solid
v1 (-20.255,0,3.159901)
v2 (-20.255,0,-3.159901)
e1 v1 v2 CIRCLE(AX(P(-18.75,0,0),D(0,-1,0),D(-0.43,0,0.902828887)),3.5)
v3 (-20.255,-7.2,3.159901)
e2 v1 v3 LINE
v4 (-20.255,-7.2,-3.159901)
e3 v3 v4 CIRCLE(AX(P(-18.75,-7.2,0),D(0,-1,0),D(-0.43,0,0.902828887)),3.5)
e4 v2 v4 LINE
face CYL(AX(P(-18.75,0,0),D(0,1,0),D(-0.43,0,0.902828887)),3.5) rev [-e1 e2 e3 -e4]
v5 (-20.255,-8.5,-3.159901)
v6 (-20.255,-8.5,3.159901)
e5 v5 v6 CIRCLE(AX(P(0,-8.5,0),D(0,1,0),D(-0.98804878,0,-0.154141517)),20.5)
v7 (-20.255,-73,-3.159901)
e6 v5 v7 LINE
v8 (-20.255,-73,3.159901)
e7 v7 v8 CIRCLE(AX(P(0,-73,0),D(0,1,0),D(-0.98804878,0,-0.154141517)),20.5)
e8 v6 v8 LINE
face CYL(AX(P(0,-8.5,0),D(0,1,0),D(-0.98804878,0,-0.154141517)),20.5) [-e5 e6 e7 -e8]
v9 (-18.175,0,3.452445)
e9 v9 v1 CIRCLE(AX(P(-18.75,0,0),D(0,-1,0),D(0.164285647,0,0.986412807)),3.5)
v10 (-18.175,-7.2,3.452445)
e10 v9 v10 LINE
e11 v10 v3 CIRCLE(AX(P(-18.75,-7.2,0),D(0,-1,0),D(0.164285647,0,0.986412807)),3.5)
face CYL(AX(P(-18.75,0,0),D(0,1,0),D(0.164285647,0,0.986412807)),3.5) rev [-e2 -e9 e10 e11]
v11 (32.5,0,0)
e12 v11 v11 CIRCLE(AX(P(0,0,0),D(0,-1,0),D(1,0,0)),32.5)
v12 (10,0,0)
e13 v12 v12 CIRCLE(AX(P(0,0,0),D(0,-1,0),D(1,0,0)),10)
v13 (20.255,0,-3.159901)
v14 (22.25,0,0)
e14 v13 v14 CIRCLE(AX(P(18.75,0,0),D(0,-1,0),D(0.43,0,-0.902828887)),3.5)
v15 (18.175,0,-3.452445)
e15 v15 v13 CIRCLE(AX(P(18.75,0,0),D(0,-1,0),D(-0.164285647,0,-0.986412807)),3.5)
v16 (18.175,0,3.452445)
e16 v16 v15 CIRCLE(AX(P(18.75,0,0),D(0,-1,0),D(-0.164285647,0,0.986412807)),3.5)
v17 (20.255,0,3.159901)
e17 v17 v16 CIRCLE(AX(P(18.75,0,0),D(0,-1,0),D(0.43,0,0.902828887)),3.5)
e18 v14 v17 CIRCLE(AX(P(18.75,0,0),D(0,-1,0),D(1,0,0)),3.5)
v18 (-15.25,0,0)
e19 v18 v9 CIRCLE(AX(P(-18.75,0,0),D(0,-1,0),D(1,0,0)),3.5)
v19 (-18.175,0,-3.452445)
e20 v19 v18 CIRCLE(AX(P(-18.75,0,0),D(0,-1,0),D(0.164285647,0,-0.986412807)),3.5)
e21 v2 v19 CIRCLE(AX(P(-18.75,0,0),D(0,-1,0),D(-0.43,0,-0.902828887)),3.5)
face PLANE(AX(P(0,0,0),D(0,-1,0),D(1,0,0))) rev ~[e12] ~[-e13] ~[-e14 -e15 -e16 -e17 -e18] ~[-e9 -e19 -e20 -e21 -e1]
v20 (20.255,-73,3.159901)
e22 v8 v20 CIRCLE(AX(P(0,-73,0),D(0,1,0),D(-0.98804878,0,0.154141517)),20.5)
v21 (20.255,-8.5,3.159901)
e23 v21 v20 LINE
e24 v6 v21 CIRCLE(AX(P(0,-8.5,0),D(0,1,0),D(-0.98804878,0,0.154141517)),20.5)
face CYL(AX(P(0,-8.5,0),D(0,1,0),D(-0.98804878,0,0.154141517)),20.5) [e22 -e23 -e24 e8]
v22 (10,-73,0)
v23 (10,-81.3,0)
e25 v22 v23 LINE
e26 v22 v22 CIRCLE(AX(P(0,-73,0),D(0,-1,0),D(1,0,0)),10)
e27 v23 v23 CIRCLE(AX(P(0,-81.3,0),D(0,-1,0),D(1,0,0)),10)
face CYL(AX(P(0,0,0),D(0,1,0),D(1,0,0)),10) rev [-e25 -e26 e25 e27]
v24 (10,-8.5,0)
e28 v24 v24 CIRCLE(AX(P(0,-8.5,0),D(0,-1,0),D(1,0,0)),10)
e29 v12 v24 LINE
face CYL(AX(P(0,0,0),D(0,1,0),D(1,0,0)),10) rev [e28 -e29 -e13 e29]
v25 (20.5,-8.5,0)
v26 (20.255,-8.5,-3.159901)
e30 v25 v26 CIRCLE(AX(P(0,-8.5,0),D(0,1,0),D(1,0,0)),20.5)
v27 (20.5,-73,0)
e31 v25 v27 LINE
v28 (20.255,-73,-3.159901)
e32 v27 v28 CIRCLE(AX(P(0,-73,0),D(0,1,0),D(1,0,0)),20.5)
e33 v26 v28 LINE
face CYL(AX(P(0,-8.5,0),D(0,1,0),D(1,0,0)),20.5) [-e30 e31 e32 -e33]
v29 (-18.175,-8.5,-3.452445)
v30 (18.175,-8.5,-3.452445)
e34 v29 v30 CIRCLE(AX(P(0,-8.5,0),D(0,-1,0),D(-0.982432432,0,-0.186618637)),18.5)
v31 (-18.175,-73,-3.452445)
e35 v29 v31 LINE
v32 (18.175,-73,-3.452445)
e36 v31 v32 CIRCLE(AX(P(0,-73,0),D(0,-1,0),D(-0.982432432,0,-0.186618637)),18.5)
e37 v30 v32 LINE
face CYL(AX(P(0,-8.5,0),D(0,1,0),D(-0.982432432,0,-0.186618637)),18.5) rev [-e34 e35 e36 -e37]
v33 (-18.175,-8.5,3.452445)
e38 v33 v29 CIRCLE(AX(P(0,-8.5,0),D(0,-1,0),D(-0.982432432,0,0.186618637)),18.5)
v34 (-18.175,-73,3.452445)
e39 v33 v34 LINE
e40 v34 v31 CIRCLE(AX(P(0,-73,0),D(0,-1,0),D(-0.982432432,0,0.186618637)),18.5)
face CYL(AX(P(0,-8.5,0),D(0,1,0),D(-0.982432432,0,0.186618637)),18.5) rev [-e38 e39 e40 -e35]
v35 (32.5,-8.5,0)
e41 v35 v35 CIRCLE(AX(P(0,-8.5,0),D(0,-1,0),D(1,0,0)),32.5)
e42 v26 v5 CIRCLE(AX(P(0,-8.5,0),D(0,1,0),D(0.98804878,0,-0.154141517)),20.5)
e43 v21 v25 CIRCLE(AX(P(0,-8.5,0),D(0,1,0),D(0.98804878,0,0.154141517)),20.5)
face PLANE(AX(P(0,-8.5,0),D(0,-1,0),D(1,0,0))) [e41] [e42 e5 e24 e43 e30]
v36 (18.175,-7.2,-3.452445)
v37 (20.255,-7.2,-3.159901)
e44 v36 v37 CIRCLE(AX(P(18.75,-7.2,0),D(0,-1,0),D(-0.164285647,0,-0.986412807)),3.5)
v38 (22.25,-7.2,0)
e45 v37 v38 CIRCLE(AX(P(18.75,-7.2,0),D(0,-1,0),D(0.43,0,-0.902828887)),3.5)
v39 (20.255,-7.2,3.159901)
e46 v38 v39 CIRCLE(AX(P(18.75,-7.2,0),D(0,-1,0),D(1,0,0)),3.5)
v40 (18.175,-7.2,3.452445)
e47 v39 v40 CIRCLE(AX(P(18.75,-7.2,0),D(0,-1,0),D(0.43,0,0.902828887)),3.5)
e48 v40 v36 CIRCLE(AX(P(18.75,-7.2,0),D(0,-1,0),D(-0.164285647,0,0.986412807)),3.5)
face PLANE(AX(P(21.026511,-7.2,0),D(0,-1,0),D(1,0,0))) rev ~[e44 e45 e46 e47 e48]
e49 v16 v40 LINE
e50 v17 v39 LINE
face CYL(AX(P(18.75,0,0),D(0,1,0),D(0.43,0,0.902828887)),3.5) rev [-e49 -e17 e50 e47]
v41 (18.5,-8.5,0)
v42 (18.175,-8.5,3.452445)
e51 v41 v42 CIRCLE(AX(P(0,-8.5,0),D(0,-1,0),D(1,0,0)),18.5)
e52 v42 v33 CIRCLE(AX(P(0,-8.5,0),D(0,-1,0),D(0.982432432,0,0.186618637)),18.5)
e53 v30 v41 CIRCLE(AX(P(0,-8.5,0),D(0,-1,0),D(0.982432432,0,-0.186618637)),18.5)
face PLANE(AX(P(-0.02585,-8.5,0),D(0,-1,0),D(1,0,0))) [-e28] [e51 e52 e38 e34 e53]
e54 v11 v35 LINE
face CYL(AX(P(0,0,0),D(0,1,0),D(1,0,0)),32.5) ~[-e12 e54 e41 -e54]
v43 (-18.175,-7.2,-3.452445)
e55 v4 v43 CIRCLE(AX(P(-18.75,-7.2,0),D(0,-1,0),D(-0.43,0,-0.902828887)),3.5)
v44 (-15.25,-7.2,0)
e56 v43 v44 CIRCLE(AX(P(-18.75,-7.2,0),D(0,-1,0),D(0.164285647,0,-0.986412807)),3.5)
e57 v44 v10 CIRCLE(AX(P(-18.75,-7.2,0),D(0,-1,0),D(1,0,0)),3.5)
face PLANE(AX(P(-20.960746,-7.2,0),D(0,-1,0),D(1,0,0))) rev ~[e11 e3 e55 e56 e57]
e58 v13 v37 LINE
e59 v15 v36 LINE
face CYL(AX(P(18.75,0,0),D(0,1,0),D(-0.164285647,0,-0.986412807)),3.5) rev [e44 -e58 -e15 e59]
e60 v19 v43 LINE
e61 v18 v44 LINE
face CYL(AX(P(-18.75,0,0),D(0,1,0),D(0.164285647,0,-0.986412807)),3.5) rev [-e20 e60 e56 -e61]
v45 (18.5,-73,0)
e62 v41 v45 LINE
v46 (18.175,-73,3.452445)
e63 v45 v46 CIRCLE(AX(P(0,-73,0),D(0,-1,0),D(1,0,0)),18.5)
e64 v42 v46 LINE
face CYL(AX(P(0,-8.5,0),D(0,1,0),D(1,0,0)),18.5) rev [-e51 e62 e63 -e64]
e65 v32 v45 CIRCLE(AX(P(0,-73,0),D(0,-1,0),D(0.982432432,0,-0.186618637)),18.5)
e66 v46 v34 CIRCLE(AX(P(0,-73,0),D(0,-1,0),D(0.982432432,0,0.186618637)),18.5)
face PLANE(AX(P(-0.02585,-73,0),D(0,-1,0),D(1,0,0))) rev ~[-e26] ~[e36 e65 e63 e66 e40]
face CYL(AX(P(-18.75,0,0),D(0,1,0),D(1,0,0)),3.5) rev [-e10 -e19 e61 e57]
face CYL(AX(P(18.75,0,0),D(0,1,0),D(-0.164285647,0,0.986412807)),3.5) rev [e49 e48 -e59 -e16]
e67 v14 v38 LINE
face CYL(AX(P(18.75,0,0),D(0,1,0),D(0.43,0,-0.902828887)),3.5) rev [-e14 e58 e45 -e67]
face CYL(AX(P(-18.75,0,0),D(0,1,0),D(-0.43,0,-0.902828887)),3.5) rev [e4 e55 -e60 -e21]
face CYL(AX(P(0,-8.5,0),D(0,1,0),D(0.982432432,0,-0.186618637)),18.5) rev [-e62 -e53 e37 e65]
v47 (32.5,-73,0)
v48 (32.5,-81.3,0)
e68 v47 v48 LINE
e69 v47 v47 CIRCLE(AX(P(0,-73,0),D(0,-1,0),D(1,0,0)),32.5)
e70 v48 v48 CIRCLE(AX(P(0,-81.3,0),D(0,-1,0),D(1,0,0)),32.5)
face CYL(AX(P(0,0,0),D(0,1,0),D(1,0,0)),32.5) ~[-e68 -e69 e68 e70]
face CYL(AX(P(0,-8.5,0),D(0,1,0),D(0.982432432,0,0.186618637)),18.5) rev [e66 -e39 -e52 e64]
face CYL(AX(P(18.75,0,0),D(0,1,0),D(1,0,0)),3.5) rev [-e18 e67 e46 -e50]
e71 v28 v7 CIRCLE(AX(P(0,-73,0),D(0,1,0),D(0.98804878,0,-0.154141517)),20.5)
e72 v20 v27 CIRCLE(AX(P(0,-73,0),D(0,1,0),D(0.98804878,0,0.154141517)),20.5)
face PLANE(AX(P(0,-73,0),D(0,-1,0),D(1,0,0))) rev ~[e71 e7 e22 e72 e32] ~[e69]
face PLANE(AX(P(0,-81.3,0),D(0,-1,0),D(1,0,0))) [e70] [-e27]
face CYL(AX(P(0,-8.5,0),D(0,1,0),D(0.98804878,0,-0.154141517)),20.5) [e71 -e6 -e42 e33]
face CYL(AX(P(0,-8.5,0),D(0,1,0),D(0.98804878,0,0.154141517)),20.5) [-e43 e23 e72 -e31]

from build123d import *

# Parameters (mm, degrees)
F0_R     = 32.5
F0_R_2   = 10
F1_DEPTH = 81.3
F2_DEPTH = 7.2
F3_START = 8.5
F3_DEPTH = 64.5
F4_START = 8.5
F4_DEPTH = 64.5


with BuildPart() as f1:
    # F0 (on Front) → F1 (new body)
    with BuildSketch(Plane.XZ):
        Circle(F0_R)
        with BuildLine():
            ThreePointArc((-20.255, -3.159901106), (-22.25, 0), (-20.255, 3.159901106))
            ThreePointArc((-20.255, 3.159901106), (0, 20.5), (20.255, 3.159901106))
            ThreePointArc((20.255, 3.159901106), (21.7095185419, 1.8684886941), (22.25, 0))
            ThreePointArc((22.25, 0), (21.7095185419, -1.8684886941), (20.255, -3.159901106))
            ThreePointArc((20.255, -3.159901106), (0, -20.5), (-20.255, -3.159901106))
        make_face(mode=Mode.SUBTRACT)
        with BuildLine():
            ThreePointArc((-18.1750002352, 3.4524448251), (-16.0795600384, 2.2624655603), (-15.25, 0))
            ThreePointArc((-15.25, 0), (-16.0795600384, -2.2624655603), (-18.1750002352, -3.4524448251))
            ThreePointArc((-18.1750002352, -3.4524448251), (0, -18.5000002384), (18.1750002352, -3.4524448251))
            ThreePointArc((18.1750002352, -3.4524448251), (15.25, 0), (18.1750002352, 3.4524448251))
            ThreePointArc((18.1750002352, 3.4524448251), (0, 18.5000002384), (-18.1750002352, 3.4524448251))
        make_face()
        Circle(F0_R_2, mode=Mode.SUBTRACT)
        with BuildLine():
            ThreePointArc((-20.255, 3.159901106), (-19.2374633999, 3.4658879719), (-18.1750002352, 3.4524448251))
            ThreePointArc((-18.1750002352, 3.4524448251), (0, 18.5000002384), (18.1750002352, 3.4524448251))
            ThreePointArc((18.1750002352, 3.4524448251), (19.2374633999, 3.4658879719), (20.255, 3.159901106))
            ThreePointArc((20.255, 3.159901106), (0, 20.5), (-20.255, 3.159901106))
        make_face()
        with BuildLine():
            ThreePointArc((18.1750002352, -3.4524448251), (0, -18.5000002384), (-18.1750002352, -3.4524448251))
            ThreePointArc((-18.1750002352, -3.4524448251), (-19.2374633999, -3.4658879719), (-20.255, -3.159901106))
            ThreePointArc((-20.255, -3.159901106), (0, -20.5), (20.255, -3.159901106))
            ThreePointArc((20.255, -3.159901106), (19.2374633999, -3.4658879719), (18.1750002352, -3.4524448251))
        make_face()
        with BuildLine():
            ThreePointArc((-18.1750002352, -3.4524448251), (-16.0795600384, -2.2624655603), (-15.25, 0))
            ThreePointArc((-15.25, 0), (-16.0795600384, 2.2624655603), (-18.1750002352, 3.4524448251))
            ThreePointArc((-18.1750002352, 3.4524448251), (-18.5000002384, 0), (-18.1750002352, -3.4524448251))
        make_face()
        with BuildLine():
            ThreePointArc((18.5000002384, 0), (18.4185710291, 1.7338541081), (18.1750002352, 3.4524448251))
            ThreePointArc((18.1750002352, 3.4524448251), (15.25, 0), (18.1750002352, -3.4524448251))
            ThreePointArc((18.1750002352, -3.4524448251), (18.4185710291, -1.7338541081), (18.5000002384, 0))
        make_face()
        with BuildLine():
            ThreePointArc((20.255, 3.159901106), (19.2374633999, 3.4658879719), (18.1750002352, 3.4524448251))
            ThreePointArc((18.1750002352, 3.4524448251), (18.4185710291, 1.7338541081), (18.5000002384, 0))
            ThreePointArc((18.5000002384, 0), (18.4185710291, -1.7338541081), (18.1750002352, -3.4524448251))
            ThreePointArc((18.1750002352, -3.4524448251), (19.2374633999, -3.4658879719), (20.255, -3.159901106))
            ThreePointArc((20.255, -3.159901106), (20.4386582241, -1.5846923992), (20.5, 0))
            ThreePointArc((20.5, 0), (20.4386582241, 1.5846923992), (20.255, 3.159901106))
        make_face()
        with BuildLine():
            ThreePointArc((-18.1750002352, -3.4524448251), (-18.5000002384, 0), (-18.1750002352, 3.4524448251))
            ThreePointArc((-18.1750002352, 3.4524448251), (-19.2374633999, 3.4658879719), (-20.255, 3.159901106))
            ThreePointArc((-20.255, 3.159901106), (-20.5, 0), (-20.255, -3.159901106))
            ThreePointArc((-20.255, -3.159901106), (-19.2374633999, -3.4658879719), (-18.1750002352, -3.4524448251))
        make_face()
        with BuildLine():
            ThreePointArc((22.25, 0), (21.7095185419, 1.8684886941), (20.255, 3.159901106))
            ThreePointArc((20.255, 3.159901106), (20.4386582241, 1.5846923992), (20.5, 0))
            ThreePointArc((20.5, 0), (20.4386582241, -1.5846923992), (20.255, -3.159901106))
            ThreePointArc((20.255, -3.159901106), (21.7095185419, -1.8684886941), (22.25, 0))
        make_face()
        with BuildLine():
            ThreePointArc((-20.255, -3.159901106), (-20.5, 0), (-20.255, 3.159901106))
            ThreePointArc((-20.255, 3.159901106), (-22.25, 0), (-20.255, -3.159901106))
        make_face()
    extrude(amount=F1_DEPTH)

    # F0 (on Front) → F2 (cut)
    with BuildSketch(Plane.XZ):
        with BuildLine():
            ThreePointArc((22.25, 0), (21.7095185419, 1.8684886941), (20.255, 3.159901106))
            ThreePointArc((20.255, 3.159901106), (20.4386582241, 1.5846923992), (20.5, 0))
            ThreePointArc((20.5, 0), (20.4386582241, -1.5846923992), (20.255, -3.159901106))
            ThreePointArc((20.255, -3.159901106), (21.7095185419, -1.8684886941), (22.25, 0))
        make_face()
        with BuildLine():
            ThreePointArc((20.255, 3.159901106), (19.2374633999, 3.4658879719), (18.1750002352, 3.4524448251))
            ThreePointArc((18.1750002352, 3.4524448251), (18.4185710291, 1.7338541081), (18.5000002384, 0))
            ThreePointArc((18.5000002384, 0), (18.4185710291, -1.7338541081), (18.1750002352, -3.4524448251))
            ThreePointArc((18.1750002352, -3.4524448251), (19.2374633999, -3.4658879719), (20.255, -3.159901106))
            ThreePointArc((20.255, -3.159901106), (20.4386582241, -1.5846923992), (20.5, 0))
            ThreePointArc((20.5, 0), (20.4386582241, 1.5846923992), (20.255, 3.159901106))
        make_face()
        with BuildLine():
            ThreePointArc((-20.255, -3.159901106), (-20.5, 0), (-20.255, 3.159901106))
            ThreePointArc((-20.255, 3.159901106), (-22.25, 0), (-20.255, -3.159901106))
        make_face()
        with BuildLine():
            ThreePointArc((-18.1750002352, -3.4524448251), (-18.5000002384, 0), (-18.1750002352, 3.4524448251))
            ThreePointArc((-18.1750002352, 3.4524448251), (-19.2374633999, 3.4658879719), (-20.255, 3.159901106))
            ThreePointArc((-20.255, 3.159901106), (-20.5, 0), (-20.255, -3.159901106))
            ThreePointArc((-20.255, -3.159901106), (-19.2374633999, -3.4658879719), (-18.1750002352, -3.4524448251))
        make_face()
        with BuildLine():
            ThreePointArc((-18.1750002352, -3.4524448251), (-16.0795600384, -2.2624655603), (-15.25, 0))
            ThreePointArc((-15.25, 0), (-16.0795600384, 2.2624655603), (-18.1750002352, 3.4524448251))
            ThreePointArc((-18.1750002352, 3.4524448251), (-18.5000002384, 0), (-18.1750002352, -3.4524448251))
        make_face()
        with BuildLine():
            ThreePointArc((18.5000002384, 0), (18.4185710291, 1.7338541081), (18.1750002352, 3.4524448251))
            ThreePointArc((18.1750002352, 3.4524448251), (15.25, 0), (18.1750002352, -3.4524448251))
            ThreePointArc((18.1750002352, -3.4524448251), (18.4185710291, -1.7338541081), (18.5000002384, 0))
        make_face()
    extrude(amount=F2_DEPTH, mode=Mode.SUBTRACT)

    # F0 (on Front) → F3 (cut)
    with BuildSketch(Plane.XZ.offset(F3_START)):
        Circle(F0_R)
        with BuildLine():
            ThreePointArc((-20.255, -3.159901106), (-22.25, 0), (-20.255, 3.159901106))
            ThreePointArc((-20.255, 3.159901106), (0, 20.5), (20.255, 3.159901106))
            ThreePointArc((20.255, 3.159901106), (21.7095185419, 1.8684886941), (22.25, 0))
            ThreePointArc((22.25, 0), (21.7095185419, -1.8684886941), (20.255, -3.159901106))
            ThreePointArc((20.255, -3.159901106), (0, -20.5), (-20.255, -3.159901106))
        make_face(mode=Mode.SUBTRACT)
        with BuildLine():
            ThreePointArc((-20.255, -3.159901106), (-20.5, 0), (-20.255, 3.159901106))
            ThreePointArc((-20.255, 3.159901106), (-22.25, 0), (-20.255, -3.159901106))
        make_face()
        with BuildLine():
            ThreePointArc((22.25, 0), (21.7095185419, 1.8684886941), (20.255, 3.159901106))
            ThreePointArc((20.255, 3.159901106), (20.4386582241, 1.5846923992), (20.5, 0))
            ThreePointArc((20.5, 0), (20.4386582241, -1.5846923992), (20.255, -3.159901106))
            ThreePointArc((20.255, -3.159901106), (21.7095185419, -1.8684886941), (22.25, 0))
        make_face()
    extrude(amount=F3_DEPTH, mode=Mode.SUBTRACT)

    # F0 (on Front) → F4 (cut)
    with BuildSketch(Plane.XZ.offset(F4_START)):
        with BuildLine():
            ThreePointArc((-18.1750002352, 3.4524448251), (-16.0795600384, 2.2624655603), (-15.25, 0))
            ThreePointArc((-15.25, 0), (-16.0795600384, -2.2624655603), (-18.1750002352, -3.4524448251))
            ThreePointArc((-18.1750002352, -3.4524448251), (0, -18.5000002384), (18.1750002352, -3.4524448251))
            ThreePointArc((18.1750002352, -3.4524448251), (15.25, 0), (18.1750002352, 3.4524448251))
            ThreePointArc((18.1750002352, 3.4524448251), (0, 18.5000002384), (-18.1750002352, 3.4524448251))
        make_face()
        Circle(F0_R_2, mode=Mode.SUBTRACT)
        with BuildLine():
            ThreePointArc((-18.1750002352, -3.4524448251), (-16.0795600384, -2.2624655603), (-15.25, 0))
            ThreePointArc((-15.25, 0), (-16.0795600384, 2.2624655603), (-18.1750002352, 3.4524448251))
            ThreePointArc((-18.1750002352, 3.4524448251), (-18.5000002384, 0), (-18.1750002352, -3.4524448251))
        make_face()
        with BuildLine():
            ThreePointArc((18.5000002384, 0), (18.4185710291, 1.7338541081), (18.1750002352, 3.4524448251))
            ThreePointArc((18.1750002352, 3.4524448251), (15.25, 0), (18.1750002352, -3.4524448251))
            ThreePointArc((18.1750002352, -3.4524448251), (18.4185710291, -1.7338541081), (18.5000002384, 0))
        make_face()
    extrude(amount=F4_DEPTH, mode=Mode.SUBTRACT)


solid = f1.part
